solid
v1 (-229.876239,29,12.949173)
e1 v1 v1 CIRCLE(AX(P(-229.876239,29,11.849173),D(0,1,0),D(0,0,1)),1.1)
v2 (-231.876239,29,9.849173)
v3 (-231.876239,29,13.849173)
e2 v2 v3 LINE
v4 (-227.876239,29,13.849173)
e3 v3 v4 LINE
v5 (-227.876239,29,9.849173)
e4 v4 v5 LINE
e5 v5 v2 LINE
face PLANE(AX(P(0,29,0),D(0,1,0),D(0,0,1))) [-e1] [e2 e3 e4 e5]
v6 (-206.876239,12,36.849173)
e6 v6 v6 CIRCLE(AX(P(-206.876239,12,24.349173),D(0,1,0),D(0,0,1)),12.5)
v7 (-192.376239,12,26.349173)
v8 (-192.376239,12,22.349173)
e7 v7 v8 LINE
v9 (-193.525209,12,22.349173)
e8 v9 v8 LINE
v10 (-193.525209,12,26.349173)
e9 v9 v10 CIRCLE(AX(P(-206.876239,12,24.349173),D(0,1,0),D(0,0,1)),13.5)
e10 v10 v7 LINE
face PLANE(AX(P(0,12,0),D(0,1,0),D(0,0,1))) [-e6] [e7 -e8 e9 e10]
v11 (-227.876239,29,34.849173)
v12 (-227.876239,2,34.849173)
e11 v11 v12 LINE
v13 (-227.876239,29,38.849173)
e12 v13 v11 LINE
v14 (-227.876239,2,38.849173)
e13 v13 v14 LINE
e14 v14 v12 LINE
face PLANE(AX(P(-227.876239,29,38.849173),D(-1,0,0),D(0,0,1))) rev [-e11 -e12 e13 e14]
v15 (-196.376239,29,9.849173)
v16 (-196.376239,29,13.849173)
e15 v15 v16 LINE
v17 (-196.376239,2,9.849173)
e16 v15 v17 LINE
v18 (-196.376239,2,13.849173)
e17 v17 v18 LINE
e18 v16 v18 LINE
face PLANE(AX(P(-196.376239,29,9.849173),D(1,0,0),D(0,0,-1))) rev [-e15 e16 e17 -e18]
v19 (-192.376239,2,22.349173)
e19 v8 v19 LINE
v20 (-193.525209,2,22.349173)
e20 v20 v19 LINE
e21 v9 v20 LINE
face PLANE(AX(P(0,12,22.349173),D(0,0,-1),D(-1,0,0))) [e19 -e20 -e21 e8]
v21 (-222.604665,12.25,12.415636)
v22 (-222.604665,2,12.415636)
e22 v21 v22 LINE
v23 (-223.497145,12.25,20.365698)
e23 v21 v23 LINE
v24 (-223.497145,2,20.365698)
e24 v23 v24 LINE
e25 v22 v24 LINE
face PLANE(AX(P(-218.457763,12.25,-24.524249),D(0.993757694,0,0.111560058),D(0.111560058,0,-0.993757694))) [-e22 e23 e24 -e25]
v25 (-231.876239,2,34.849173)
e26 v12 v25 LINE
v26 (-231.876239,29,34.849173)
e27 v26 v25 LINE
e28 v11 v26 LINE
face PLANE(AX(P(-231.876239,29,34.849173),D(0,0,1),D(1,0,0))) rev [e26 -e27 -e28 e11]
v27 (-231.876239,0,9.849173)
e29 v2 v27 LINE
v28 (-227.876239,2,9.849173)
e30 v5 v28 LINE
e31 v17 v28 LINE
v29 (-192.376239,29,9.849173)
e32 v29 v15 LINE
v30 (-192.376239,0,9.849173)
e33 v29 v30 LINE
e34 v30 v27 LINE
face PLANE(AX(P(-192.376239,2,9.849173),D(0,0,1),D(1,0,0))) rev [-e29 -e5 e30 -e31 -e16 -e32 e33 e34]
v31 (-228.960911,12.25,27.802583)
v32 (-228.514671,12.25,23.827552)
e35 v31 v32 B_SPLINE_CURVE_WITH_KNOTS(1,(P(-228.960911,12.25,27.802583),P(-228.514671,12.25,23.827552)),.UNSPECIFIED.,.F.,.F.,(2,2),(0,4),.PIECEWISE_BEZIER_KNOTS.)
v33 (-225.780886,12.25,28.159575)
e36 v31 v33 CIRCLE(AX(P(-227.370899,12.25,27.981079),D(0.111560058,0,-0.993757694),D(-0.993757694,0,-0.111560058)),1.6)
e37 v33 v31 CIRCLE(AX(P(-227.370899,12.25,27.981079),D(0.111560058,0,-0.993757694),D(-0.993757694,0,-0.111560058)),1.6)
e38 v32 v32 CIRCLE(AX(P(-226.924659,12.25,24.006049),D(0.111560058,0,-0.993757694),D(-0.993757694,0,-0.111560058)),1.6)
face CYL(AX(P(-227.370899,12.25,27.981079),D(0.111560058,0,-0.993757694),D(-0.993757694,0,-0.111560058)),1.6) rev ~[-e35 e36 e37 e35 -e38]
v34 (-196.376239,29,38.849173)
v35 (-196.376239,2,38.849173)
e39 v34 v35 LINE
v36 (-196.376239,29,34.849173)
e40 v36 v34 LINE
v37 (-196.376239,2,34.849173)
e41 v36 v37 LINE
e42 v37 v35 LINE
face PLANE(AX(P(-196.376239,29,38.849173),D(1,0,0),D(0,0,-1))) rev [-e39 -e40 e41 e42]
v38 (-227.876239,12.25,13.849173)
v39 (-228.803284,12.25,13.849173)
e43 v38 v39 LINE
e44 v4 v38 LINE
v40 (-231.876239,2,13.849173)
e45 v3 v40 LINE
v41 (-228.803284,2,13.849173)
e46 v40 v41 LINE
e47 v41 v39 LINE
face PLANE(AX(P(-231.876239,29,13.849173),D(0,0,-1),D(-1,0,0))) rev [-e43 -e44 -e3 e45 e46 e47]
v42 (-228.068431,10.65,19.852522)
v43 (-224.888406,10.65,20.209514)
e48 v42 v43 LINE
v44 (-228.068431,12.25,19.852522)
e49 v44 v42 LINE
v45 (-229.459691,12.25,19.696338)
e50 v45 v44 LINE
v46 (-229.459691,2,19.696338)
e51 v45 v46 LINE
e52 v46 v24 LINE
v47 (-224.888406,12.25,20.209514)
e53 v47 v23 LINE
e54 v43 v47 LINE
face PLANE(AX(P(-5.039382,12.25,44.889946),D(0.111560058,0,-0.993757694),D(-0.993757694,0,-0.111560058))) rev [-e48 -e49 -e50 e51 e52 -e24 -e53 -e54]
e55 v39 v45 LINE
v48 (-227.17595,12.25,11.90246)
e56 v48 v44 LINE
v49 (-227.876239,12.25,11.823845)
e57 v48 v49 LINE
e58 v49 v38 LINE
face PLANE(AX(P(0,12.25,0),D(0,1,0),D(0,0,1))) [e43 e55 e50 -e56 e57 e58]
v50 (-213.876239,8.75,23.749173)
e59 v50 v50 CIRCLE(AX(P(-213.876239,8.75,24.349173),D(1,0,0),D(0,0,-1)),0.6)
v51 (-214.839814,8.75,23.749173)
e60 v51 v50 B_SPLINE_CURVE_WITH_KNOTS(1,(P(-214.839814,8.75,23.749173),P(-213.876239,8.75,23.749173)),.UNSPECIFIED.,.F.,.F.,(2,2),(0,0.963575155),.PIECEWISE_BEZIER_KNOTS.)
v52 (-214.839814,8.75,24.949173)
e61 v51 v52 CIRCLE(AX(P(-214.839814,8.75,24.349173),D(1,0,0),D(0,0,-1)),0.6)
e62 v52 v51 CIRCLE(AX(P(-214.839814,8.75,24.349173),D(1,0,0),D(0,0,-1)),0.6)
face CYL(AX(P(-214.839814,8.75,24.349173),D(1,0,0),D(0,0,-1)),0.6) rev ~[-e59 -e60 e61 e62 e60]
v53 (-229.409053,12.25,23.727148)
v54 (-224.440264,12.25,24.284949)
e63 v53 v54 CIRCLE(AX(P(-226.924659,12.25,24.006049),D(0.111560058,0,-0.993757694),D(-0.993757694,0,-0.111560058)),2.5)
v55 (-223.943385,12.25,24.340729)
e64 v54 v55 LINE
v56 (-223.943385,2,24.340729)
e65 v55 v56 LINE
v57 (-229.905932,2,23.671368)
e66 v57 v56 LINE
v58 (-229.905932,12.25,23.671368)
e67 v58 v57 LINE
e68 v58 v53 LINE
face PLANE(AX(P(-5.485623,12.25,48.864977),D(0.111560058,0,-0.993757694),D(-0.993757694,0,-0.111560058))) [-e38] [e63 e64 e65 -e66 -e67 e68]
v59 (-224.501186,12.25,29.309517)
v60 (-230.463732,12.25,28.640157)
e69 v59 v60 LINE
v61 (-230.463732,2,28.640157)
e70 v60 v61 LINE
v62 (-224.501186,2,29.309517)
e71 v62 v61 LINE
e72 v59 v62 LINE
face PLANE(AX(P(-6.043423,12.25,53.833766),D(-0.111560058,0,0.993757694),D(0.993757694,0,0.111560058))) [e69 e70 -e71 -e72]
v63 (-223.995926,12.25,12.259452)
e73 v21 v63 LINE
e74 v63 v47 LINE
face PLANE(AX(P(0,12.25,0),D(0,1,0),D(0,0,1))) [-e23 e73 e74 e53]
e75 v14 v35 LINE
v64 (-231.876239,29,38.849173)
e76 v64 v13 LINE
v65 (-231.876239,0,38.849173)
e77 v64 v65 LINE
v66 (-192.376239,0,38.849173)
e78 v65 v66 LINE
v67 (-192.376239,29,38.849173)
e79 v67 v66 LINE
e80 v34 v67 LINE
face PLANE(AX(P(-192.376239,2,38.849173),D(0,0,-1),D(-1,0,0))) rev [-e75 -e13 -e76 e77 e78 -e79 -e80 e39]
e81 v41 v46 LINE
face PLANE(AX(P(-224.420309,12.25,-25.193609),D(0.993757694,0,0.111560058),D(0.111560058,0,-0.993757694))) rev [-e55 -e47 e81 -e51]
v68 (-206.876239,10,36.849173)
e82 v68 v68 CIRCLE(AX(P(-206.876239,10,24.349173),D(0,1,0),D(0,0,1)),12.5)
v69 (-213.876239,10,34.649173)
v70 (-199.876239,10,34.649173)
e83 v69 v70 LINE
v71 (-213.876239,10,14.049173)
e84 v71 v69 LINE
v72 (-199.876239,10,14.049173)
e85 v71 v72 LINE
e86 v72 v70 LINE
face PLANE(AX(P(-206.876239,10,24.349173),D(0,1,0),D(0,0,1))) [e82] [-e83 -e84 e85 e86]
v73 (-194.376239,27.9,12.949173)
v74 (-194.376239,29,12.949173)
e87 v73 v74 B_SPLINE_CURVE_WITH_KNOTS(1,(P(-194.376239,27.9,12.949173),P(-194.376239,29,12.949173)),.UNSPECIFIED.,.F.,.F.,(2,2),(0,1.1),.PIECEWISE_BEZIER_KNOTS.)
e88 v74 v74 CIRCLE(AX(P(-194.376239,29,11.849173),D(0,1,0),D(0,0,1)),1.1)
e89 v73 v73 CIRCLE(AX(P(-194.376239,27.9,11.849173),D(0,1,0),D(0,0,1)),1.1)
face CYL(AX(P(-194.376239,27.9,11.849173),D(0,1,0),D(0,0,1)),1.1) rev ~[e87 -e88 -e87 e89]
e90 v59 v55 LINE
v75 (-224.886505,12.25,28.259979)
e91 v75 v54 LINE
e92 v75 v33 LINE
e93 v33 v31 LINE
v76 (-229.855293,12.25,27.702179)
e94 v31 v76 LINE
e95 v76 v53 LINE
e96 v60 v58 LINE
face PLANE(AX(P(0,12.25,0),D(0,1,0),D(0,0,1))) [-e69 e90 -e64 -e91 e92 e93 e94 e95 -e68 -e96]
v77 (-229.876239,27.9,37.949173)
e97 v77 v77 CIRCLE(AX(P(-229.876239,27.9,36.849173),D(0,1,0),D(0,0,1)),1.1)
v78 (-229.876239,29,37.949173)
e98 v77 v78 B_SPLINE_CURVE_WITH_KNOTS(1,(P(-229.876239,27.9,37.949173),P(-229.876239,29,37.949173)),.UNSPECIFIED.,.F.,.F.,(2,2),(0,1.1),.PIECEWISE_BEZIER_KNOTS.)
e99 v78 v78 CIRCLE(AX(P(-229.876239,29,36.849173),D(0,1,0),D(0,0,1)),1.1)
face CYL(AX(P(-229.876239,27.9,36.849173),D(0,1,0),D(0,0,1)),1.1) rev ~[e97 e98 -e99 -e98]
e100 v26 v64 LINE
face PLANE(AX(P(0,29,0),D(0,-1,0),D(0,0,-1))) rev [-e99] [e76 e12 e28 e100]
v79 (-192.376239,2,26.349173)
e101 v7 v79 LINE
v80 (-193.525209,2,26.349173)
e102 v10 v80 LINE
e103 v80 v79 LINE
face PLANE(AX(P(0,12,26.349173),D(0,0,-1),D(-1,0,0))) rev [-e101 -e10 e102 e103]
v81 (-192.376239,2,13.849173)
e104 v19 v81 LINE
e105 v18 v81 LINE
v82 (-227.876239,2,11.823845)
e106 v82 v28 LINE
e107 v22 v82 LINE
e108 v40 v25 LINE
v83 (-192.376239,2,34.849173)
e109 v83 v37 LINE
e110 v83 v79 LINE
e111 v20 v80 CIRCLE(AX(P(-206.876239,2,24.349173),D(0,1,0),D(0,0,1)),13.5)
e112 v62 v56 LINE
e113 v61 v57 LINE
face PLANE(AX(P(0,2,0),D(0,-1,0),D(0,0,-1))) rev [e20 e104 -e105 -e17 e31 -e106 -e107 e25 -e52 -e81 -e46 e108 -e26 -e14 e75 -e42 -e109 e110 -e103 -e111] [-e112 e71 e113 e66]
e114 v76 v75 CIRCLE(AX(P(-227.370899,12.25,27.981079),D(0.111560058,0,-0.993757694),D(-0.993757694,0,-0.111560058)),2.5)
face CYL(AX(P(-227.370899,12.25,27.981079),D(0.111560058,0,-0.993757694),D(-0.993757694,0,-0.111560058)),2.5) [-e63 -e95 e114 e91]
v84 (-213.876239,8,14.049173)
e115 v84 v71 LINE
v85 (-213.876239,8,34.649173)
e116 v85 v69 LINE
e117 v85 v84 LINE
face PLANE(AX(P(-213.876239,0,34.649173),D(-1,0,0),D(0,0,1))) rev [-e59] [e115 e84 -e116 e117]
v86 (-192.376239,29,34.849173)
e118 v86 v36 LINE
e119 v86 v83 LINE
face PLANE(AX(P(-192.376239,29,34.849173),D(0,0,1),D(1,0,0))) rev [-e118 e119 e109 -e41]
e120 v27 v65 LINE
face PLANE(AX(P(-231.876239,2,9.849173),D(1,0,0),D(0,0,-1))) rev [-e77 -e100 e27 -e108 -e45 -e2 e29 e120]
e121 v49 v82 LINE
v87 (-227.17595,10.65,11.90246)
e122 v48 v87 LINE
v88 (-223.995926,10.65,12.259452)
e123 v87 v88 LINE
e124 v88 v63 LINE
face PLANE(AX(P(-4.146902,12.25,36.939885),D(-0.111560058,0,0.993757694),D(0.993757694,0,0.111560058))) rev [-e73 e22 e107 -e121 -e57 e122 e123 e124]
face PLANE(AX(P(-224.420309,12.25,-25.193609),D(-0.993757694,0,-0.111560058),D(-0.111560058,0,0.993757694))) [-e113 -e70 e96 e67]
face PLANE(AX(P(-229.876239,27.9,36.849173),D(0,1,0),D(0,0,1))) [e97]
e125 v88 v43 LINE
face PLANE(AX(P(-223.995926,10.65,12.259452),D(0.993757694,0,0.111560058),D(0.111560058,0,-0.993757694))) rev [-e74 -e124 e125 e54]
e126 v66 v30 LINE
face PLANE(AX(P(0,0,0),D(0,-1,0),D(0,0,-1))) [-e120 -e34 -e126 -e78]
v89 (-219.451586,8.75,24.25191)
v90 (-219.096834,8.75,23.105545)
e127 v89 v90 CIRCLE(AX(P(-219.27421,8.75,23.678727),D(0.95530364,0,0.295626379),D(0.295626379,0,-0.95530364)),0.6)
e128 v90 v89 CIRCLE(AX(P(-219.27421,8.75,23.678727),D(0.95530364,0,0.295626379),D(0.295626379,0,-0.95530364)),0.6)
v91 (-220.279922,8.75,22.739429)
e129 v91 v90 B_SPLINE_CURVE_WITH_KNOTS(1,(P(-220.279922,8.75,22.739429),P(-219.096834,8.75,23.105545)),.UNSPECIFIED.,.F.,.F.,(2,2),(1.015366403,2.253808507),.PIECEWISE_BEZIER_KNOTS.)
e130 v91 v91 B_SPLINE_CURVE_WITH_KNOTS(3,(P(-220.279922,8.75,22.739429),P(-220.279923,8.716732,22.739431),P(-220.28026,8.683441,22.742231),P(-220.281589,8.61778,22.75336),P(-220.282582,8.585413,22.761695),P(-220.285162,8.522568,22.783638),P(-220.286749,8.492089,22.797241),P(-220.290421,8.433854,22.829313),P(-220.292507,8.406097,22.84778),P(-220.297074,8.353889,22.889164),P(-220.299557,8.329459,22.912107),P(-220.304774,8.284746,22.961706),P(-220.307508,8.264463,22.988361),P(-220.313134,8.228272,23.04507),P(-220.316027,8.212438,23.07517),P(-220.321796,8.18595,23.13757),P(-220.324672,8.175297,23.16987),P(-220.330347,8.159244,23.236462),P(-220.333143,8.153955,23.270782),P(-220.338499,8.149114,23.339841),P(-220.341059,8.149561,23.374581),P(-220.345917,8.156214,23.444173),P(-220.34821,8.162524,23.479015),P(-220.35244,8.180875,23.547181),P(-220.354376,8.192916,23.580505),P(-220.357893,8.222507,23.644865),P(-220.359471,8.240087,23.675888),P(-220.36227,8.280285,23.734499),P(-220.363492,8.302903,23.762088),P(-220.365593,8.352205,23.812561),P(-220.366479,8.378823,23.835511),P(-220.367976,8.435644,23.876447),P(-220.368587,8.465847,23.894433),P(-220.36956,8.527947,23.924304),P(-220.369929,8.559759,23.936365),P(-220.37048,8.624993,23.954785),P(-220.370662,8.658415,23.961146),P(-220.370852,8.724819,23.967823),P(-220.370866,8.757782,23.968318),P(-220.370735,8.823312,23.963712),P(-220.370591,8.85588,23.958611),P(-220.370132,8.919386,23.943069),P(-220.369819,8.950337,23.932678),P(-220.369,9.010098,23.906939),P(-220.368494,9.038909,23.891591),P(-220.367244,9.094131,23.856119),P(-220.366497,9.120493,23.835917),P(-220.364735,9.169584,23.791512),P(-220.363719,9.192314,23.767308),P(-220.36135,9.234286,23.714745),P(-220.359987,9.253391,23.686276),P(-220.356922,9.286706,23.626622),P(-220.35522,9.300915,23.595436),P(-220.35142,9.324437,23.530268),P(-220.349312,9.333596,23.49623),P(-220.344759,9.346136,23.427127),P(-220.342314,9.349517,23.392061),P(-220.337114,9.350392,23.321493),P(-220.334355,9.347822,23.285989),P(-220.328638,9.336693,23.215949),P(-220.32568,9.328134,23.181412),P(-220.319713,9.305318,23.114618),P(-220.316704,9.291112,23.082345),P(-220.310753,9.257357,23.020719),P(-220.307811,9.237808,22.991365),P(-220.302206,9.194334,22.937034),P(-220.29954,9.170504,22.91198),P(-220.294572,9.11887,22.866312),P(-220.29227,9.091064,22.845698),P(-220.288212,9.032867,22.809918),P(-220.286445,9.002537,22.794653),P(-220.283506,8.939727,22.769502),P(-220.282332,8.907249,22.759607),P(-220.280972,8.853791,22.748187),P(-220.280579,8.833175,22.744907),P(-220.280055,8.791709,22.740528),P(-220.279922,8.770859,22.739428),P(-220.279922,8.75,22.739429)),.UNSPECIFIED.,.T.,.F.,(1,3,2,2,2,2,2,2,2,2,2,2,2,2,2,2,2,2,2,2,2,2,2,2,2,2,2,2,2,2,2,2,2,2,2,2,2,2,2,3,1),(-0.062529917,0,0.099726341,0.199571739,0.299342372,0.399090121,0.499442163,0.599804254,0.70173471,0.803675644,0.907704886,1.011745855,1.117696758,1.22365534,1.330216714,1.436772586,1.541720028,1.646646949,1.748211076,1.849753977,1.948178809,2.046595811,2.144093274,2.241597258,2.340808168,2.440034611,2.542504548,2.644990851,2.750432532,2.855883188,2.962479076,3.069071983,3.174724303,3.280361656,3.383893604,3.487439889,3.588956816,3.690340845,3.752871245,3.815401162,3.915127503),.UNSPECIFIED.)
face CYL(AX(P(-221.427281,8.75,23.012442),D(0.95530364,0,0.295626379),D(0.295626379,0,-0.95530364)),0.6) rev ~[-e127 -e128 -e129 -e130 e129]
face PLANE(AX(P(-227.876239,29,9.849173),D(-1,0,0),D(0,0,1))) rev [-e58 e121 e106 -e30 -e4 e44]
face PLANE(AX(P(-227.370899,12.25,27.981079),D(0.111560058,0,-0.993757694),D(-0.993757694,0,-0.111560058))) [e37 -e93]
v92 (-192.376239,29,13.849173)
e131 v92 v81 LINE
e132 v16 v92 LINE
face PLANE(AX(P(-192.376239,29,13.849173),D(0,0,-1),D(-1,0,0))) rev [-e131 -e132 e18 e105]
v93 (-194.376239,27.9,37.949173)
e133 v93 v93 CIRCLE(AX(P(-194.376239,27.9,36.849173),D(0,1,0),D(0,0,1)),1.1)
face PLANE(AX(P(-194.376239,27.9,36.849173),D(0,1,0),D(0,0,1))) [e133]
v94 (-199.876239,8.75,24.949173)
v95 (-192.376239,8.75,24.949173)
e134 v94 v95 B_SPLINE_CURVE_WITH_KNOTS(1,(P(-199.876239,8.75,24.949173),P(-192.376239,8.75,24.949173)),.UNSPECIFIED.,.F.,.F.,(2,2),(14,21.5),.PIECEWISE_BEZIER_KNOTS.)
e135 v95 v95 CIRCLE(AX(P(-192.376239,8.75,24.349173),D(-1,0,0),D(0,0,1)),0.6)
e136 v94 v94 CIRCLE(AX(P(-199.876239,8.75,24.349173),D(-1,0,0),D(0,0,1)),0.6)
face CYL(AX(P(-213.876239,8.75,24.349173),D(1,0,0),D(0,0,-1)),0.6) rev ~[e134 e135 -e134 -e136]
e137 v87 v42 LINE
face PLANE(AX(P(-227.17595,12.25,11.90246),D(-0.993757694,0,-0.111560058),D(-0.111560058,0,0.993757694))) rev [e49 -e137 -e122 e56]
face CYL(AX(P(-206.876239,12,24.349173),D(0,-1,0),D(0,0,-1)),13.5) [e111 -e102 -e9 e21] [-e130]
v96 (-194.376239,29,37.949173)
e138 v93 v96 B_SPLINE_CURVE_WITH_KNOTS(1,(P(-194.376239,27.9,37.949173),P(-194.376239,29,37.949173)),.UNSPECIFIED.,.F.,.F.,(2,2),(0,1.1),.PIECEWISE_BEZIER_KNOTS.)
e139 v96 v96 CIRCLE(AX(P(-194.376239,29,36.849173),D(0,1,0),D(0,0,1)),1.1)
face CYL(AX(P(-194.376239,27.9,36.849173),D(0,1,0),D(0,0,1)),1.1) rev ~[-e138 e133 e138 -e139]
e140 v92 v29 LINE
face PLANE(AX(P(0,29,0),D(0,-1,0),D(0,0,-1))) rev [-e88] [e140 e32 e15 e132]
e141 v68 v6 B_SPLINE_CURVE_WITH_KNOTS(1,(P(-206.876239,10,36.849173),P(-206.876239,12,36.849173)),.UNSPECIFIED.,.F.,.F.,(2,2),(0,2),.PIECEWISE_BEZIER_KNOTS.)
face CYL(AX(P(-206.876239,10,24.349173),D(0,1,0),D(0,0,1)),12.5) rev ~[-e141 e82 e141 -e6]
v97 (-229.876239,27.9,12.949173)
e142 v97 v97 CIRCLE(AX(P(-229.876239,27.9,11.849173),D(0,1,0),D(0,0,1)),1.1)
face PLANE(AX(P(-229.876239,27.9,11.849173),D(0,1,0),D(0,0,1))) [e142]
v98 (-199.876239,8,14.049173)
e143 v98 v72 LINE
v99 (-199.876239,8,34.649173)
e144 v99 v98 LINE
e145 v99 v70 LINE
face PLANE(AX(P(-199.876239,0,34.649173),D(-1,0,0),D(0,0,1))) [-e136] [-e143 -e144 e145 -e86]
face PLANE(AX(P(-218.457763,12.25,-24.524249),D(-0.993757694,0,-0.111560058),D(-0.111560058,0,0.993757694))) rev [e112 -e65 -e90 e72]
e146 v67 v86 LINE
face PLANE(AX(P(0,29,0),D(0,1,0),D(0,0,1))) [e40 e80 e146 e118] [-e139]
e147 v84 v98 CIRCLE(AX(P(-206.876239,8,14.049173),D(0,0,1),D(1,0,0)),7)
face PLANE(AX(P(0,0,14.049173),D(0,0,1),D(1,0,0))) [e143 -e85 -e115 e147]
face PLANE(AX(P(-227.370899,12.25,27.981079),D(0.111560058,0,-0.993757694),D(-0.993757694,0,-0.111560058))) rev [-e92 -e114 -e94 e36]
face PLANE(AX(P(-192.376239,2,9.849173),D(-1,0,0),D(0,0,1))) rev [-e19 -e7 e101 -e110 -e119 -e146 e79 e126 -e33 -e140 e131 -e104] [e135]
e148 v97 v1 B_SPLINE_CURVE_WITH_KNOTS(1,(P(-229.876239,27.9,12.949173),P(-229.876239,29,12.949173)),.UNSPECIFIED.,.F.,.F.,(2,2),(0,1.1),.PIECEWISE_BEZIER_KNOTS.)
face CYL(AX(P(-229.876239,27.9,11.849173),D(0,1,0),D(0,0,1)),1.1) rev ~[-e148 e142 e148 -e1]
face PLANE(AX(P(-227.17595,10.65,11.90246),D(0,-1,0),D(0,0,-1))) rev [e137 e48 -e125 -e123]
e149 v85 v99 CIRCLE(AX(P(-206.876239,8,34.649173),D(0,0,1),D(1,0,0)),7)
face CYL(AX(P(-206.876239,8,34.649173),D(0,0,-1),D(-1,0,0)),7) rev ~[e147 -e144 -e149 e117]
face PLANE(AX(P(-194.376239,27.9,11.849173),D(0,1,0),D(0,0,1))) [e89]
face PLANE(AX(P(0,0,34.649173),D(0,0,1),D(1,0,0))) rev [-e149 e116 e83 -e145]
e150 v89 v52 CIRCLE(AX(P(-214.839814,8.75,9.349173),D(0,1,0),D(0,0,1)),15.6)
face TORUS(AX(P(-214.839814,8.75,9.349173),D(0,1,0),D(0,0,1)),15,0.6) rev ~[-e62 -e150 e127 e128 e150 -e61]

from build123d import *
from build123d.topology import SkipClean

# Parameters (mm, degrees)
SKETCH1_W              = 39.5
SKETCH1_H              = 29
BOSS_EXTRUDE1_DEPTH    = 2
SKETCH2_R              = 13.5
SKETCH2_R_2            = 8.5
BOSS_EXTRUDE2_DEPTH    = 10
SKETCH3_R              = 12.5
CUT_EXTRUDE1_DEPTH     = 2
SKETCH4_R              = 7.5
CUT_EXTRUDE2_DEPTH     = 9
CUT_EXTRUDE3_START     = -10.3
CUT_EXTRUDE3_DEPTH     = 20.6
BOSS_EXTRUDE3_DEPTH    = 10
SKETCH10_W             = 39.5
SKETCH10_H             = 29
SKETCH10_R             = 13.5
CUT_EXTRUDE4_DEPTH     = 10
SKETCH11_R             = 13.5
SKETCH11_W             = 14
SKETCH11_H             = 20.6
BOSS_EXTRUDE4_DEPTH    = 8
SKETCH12_R             = 13.5
SKETCH12_R_2           = 12.5
BOSS_EXTRUDE5_DEPTH    = 2
CUT_SWEEP2_START       = -214.83981443
CUT_SWEEP2_OUTLINE_R   = 0.6
CUT_SWEEP2_DEPTH       = 22.83981443
CUT_SWEEP2_2_OUTLINE_R = 0.6
CUT_SWEEP2_2_ANGLE     = 17.195102
CUT_SWEEP2_START_2     = -205
CUT_SWEEP2_3_OUTLINE_R = 0.6
CUT_SWEEP2_3_DEPTH     = 2.526605635
BOSS_EXTRUDE7_DEPTH    = 10.25
CUT_EXTRUDE5_DEPTH     = 8
SKETCH20_R             = 1.6
CUT_EXTRUDE6_DEPTH     = 4
SKETCH21_R             = 2.5
SKETCH21_R_2           = 1.6
BOSS_EXTRUDE8_DEPTH    = 4
SKETCH22_W             = 4
SKETCH22_H             = 4
BOSS_EXTRUDE9_DEPTH    = 27
BOSS_EXTRUDE11_DEPTH   = 10
SKETCH8_2_R            = 0.6
SKETCH24_R             = 1.1
CUT_EXTRUDE7_DEPTH     = 1.1


with BuildPart() as part:
    # Sketch1 → Boss-Extrude1 (new body)
    with BuildSketch(Plane(origin=(0, 0, 0), x_dir=(1, 0, 0), z_dir=(0, 1, 0))):
        with Locations((-212.126239175, -24.349172792)):
            Rectangle(SKETCH1_W, SKETCH1_H)
    extrude(amount=BOSS_EXTRUDE1_DEPTH)

    # Sketch2 → Boss-Extrude2 (add)
    with BuildSketch(Plane(origin=(0, 2, 0), x_dir=(1, 0, 0), z_dir=(0, 1, 0))):
        with Locations((-206.876239175, -24.349172792)):
            Circle(SKETCH2_R)
        with Locations((-222.376239175, -24.349172792)):
            Circle(SKETCH2_R_2)
    extrude(amount=BOSS_EXTRUDE2_DEPTH)

    # Sketch3 → Cut-Extrude1 (cut)
    with BuildSketch(Plane(origin=(0, 12, 0), x_dir=(1, 0, 0), z_dir=(0, 1, 0))):
        with Locations(Location((-206.876239175, -24.349172792, 0), (0, 0, 270))):
            Circle(SKETCH3_R)
    extrude(amount=-CUT_EXTRUDE1_DEPTH, mode=Mode.SUBTRACT)

    # Sketch4 → Cut-Extrude2 (cut)
    with BuildSketch(Plane(origin=(0, 12, 0), x_dir=(1, 0, 0), z_dir=(0, 1, 0))):
        with Locations(Location((-222.376239175, -24.349172792, 0), (0, 0, 270))):
            Circle(SKETCH4_R)
    extrude(amount=-CUT_EXTRUDE2_DEPTH, mode=Mode.SUBTRACT)

    # Cut-Extrude3: read off the stored shape, not the designer's step
    # Cut-Extrude3 outline → Cut-Extrude3 (cut)
    with BuildSketch(Plane.XY.offset(24.349172792).offset(CUT_EXTRUDE3_START)):
        with BuildLine():
            ThreePointArc((-213.876239175, 8), (-206.876239175, 1), (-199.876239175, 8))
            Line((-199.876239175, 8), (-199.876239175, 10))
            Line((-199.876239175, 10), (-213.876239175, 10))
            Line((-213.876239175, 10), (-213.876239175, 8))
        make_face()
    extrude(amount=CUT_EXTRUDE3_DEPTH, mode=Mode.SUBTRACT)

    # Sketch7 → Boss-Extrude3 (add)
    with BuildSketch(Plane(origin=(0, 2, 0), x_dir=(1, 0, 0), z_dir=(0, 1, 0))):
        with BuildLine():
            Line((-192.376239175, -26.349172792), (-192.376239175, -24.349172792))
            Line((-192.376239175, -24.349172792), (-192.376239175, -22.349172792))
            Line((-192.376239175, -22.349172792), (-193.525209252, -22.349172792))
            ThreePointArc((-193.525209252, -22.349172792), (-193.413533207, -23.346402619), (-193.376239175, -24.349172792))
            ThreePointArc((-193.376239175, -24.349172792), (-193.413533207, -25.351942966), (-193.525209252, -26.349172792))
            Line((-193.525209252, -26.349172792), (-192.376239175, -26.349172792))
        make_face()
    extrude(amount=BOSS_EXTRUDE3_DEPTH)

    # Sketch10 → Cut-Extrude4 (cut)
    with BuildSketch(Plane(origin=(0, 2, 0), x_dir=(1, 0, 0), z_dir=(0, 1, 0))):
        with Locations((-212.126239175, -24.349172792)):
            Rectangle(SKETCH10_W, SKETCH10_H)
        with Locations(Location((-206.876239175, -24.349172792, 0), (0, 0, 151.062655238))):
            Circle(SKETCH10_R, mode=Mode.SUBTRACT)
    extrude(amount=CUT_EXTRUDE4_DEPTH, mode=Mode.SUBTRACT)

    # Sketch11 → Boss-Extrude4 (add)
    with BuildSketch(Plane(origin=(0, 2, 0), x_dir=(1, 0, 0), z_dir=(0, 1, 0))):
        with Locations(Location((-206.876239175, -24.349172792, 0), (0, 0, 151.062655238))):
            Circle(SKETCH11_R)
        with Locations((-206.876239175, -24.349172792)):
            Rectangle(SKETCH11_W, SKETCH11_H, mode=Mode.SUBTRACT)
    extrude(amount=BOSS_EXTRUDE4_DEPTH)

    # Sketch12 → Boss-Extrude5 (add)
    with SkipClean():  # the faces are left unmerged after this step: merging them gives an invalid solid
        with BuildSketch(Plane(origin=(0, 10, 0), x_dir=(1, 0, 0), z_dir=(0, 1, 0))):
            with Locations(Location((-206.876239175, -24.349172792, 0), (0, 0, 270))):
                Circle(SKETCH12_R)
            with Locations(Location((-206.876239175, -24.349172792, 0), (0, 0, 270))):
                Circle(SKETCH12_R_2, mode=Mode.SUBTRACT)
        extrude(amount=BOSS_EXTRUDE5_DEPTH)
    add(part.part.scale(1), mode=Mode.REPLACE)  # the faces are merged on a copy

    # Cut-Sweep2: read off the stored shape, not the designer's step
    # Cut-Sweep2 outline → Cut-Sweep2 (cut)
    with SkipClean():  # the faces are left unmerged after this step: merging them gives an invalid solid
        with BuildSketch(Plane.YZ.offset(CUT_SWEEP2_START)):
            with Locations((8.75, 24.349172792)):
                Circle(CUT_SWEEP2_OUTLINE_R)
        extrude(amount=CUT_SWEEP2_DEPTH, mode=Mode.SUBTRACT)

    # Cut-Sweep2 2 outline → Cut-Sweep2 2 (revolve, cut)
    with SkipClean():  # the faces are left unmerged after this step: merging them gives an invalid solid
        with BuildSketch(Plane(origin=(-214.83981433, 0, 9.349172792), x_dir=(-0.2956263792524328, 0, 0.9553036396298806), z_dir=(-0.9553036396298806, 0, -0.2956263792524328))):
            with Locations((15, 8.75)):
                Circle(CUT_SWEEP2_2_OUTLINE_R)
        revolve(axis=Axis((-214.83981433, 0, 9.349172792), (0, 1, 0)), revolution_arc=CUT_SWEEP2_2_ANGLE, mode=Mode.SUBTRACT)

    # Cut-Sweep2 3 outline → Cut-Sweep2 3 (cut)
    with SkipClean():  # the faces are left unmerged after this step: merging them gives an invalid solid
        with BuildSketch(Plane(origin=(0, 0, 0), x_dir=(0, 1, 0), z_dir=(0.9553036396298961, 0, 0.29562637925238305)).offset(CUT_SWEEP2_START_2)):
            with Locations((8.75, 87.443615225)):
                Circle(CUT_SWEEP2_3_OUTLINE_R)
        extrude(amount=CUT_SWEEP2_3_DEPTH, mode=Mode.SUBTRACT)

    # Sketch18 → Boss-Extrude7 (add)
    with SkipClean():  # the faces are left unmerged after this step: merging them gives an invalid solid
        with BuildSketch(Plane(origin=(0, 2, 0), x_dir=(1, 0, 0), z_dir=(0, 1, 0))):
            Polygon((-228.567210955, -11.746276031), (-229.459691419, -19.696337579), (-226.478418338, -20.031017753), (-225.585937874, -12.080956204), align=None)
            Polygon((-225.585937874, -12.080956204), (-226.478418338, -20.031017753), (-223.497145257, -20.365697927), (-222.604664794, -12.415636378), align=None)
            Polygon((-227.482458859, -28.974836995), (-226.92465857, -24.006048527), (-229.90593165, -23.671368353), (-230.46373194, -28.640156821), align=None)
            Polygon((-223.943385489, -24.340728701), (-226.92465857, -24.006048527), (-227.482458859, -28.974836995), (-224.501185779, -29.309517169), align=None)
        extrude(amount=BOSS_EXTRUDE7_DEPTH)

    # Sketch19 → Cut-Extrude5 (cut)
    with SkipClean():  # the faces are left unmerged after this step: merging them gives an invalid solid
        with BuildSketch(Plane(origin=(-5.039382401, 0, 44.889946486), x_dir=(0.9937576935397466, 0, 0.11156005795338761), z_dir=(-0.11156005795338761, 0, 0.9937576935397466))):
            Polygon((-222.830009143, 12.25), (-224.430009143, 12.25), (-224.430009143, 10.65), (-221.230009143, 10.65), (-221.230009143, 12.25), align=None)
        extrude(amount=-CUT_EXTRUDE5_DEPTH, mode=Mode.SUBTRACT)

    # Sketch20 → Cut-Extrude6 (cut)
    with SkipClean():  # the faces are left unmerged after this step: merging them gives an invalid solid
        with BuildSketch(Plane(origin=(-5.485622633, 0, 48.864977261), x_dir=(-0.9937576935397466, 0, -0.11156005795338761), z_dir=(0.11156005795338761, 0, -0.9937576935397466))):
            with Locations((222.830009143, 12.25)):
                Circle(SKETCH20_R)
        extrude(amount=-CUT_EXTRUDE6_DEPTH, mode=Mode.SUBTRACT)

    # Sketch21 → Boss-Extrude8 (add)
    with SkipClean():  # the faces are left unmerged after this step: merging them gives an invalid solid
        with BuildSketch(Plane(origin=(-5.485622633, 0, 48.864977261), x_dir=(-0.9937576935397466, 0, -0.11156005795338761), z_dir=(0.11156005795338761, 0, -0.9937576935397466))):
            with Locations((222.830009143, 12.25)):
                Circle(SKETCH21_R)
            with Locations((222.830009143, 12.25)):
                Circle(SKETCH21_R_2, mode=Mode.SUBTRACT)
        extrude(amount=-BOSS_EXTRUDE8_DEPTH)

    # Sketch22 → Boss-Extrude9 (add)
    with SkipClean():  # the faces are left unmerged after this step: merging them gives an invalid solid
        with BuildSketch(Plane(origin=(0, 2, 0), x_dir=(1, 0, 0), z_dir=(0, 1, 0))):
            with Locations((-229.876239175, -11.849172792)):
                Rectangle(SKETCH22_W, SKETCH22_H)
            with Locations((-229.876239175, -36.849172792)):
                Rectangle(SKETCH22_W, SKETCH22_H)
            with Locations((-194.376239175, -36.849172792)):
                Rectangle(SKETCH22_W, SKETCH22_H)
            with Locations((-194.376239175, -11.849172792)):
                Rectangle(SKETCH22_W, SKETCH22_H)
        extrude(amount=BOSS_EXTRUDE9_DEPTH)

    # Sketch23 → Boss-Extrude11 (add)
    with BuildSketch(Plane(origin=(0, 2, 0), x_dir=(1, 0, 0), z_dir=(0, 1, 0))):
        with BuildLine():
            Line((-193.376239175, -24.349172792), (-192.376239175, -24.349172792))
            Line((-192.376239175, -24.349172792), (-192.376239175, -22.349172792))
            Line((-192.376239175, -22.349172792), (-193.525209252, -22.349172792))
            ThreePointArc((-193.525209252, -22.349172792), (-193.413533207, -23.346402619), (-193.376239175, -24.349172792))
        make_face()
        with BuildLine():
            Line((-192.376239175, -26.349172792), (-192.376239175, -24.349172792))
            Line((-192.376239175, -24.349172792), (-193.376239175, -24.349172792))
            ThreePointArc((-193.376239175, -24.349172792), (-193.413533207, -25.351942966), (-193.525209252, -26.349172792))
            Line((-193.525209252, -26.349172792), (-192.376239175, -26.349172792))
        make_face()
    extrude(amount=BOSS_EXTRUDE11_DEPTH)

    # Cut-Sweep3: sweep along a path in Sketch17<2>
    with SkipClean():  # the faces are left unmerged after this step: merging them gives an invalid solid
        with BuildLine(Plane(origin=(0, 8.75, 0), x_dir=(1, 0, 0), z_dir=(0, 1, 0))) as cut_sweep3_path:
            Line((-192.376239175, -24.349172792), (-213.876239175, -24.349172792))
            Line((-213.876239175, -24.349172792), (-214.83981433, -24.349172792))
            ThreePointArc((-214.83981433, -24.349172792), (-217.08221049, -24.180614376), (-219.274210018, -23.678727387))
            Line((-219.274210018, -23.678727387), (-220.339151193, -23.349172792))
        # Sketch8<2> → Cut-Sweep3 (sweep, cut)
        with BuildSketch(Plane(origin=(-192.376239175, 0, 0), x_dir=(0, 0, -1), z_dir=(1, 0, 0))):
            with Locations((-24.349172792, 8.75)):
                Circle(SKETCH8_2_R)
        sweep(path=cut_sweep3_path.line, mode=Mode.SUBTRACT)
    add(part.part.scale(1), mode=Mode.REPLACE)  # the faces are merged on a copy

    # Sketch24 → Cut-Extrude7 (cut)
    with BuildSketch(Plane(origin=(0, 29, 0), x_dir=(1, 0, 0), z_dir=(0, 1, 0))):
        with Locations(Location((-229.876239175, -11.849172792, 0), (0, 0, 270))):
            Circle(SKETCH24_R)
        with Locations(Location((-229.876239175, -36.849172792, 0), (0, 0, 270))):
            Circle(SKETCH24_R)
        with Locations(Location((-194.376239175, -36.849172792, 0), (0, 0, 270))):
            Circle(SKETCH24_R)
        with Locations(Location((-194.376239175, -11.849172792, 0), (0, 0, 270))):
            Circle(SKETCH24_R)
    extrude(amount=-CUT_EXTRUDE7_DEPTH, mode=Mode.SUBTRACT)


solid = part.part
